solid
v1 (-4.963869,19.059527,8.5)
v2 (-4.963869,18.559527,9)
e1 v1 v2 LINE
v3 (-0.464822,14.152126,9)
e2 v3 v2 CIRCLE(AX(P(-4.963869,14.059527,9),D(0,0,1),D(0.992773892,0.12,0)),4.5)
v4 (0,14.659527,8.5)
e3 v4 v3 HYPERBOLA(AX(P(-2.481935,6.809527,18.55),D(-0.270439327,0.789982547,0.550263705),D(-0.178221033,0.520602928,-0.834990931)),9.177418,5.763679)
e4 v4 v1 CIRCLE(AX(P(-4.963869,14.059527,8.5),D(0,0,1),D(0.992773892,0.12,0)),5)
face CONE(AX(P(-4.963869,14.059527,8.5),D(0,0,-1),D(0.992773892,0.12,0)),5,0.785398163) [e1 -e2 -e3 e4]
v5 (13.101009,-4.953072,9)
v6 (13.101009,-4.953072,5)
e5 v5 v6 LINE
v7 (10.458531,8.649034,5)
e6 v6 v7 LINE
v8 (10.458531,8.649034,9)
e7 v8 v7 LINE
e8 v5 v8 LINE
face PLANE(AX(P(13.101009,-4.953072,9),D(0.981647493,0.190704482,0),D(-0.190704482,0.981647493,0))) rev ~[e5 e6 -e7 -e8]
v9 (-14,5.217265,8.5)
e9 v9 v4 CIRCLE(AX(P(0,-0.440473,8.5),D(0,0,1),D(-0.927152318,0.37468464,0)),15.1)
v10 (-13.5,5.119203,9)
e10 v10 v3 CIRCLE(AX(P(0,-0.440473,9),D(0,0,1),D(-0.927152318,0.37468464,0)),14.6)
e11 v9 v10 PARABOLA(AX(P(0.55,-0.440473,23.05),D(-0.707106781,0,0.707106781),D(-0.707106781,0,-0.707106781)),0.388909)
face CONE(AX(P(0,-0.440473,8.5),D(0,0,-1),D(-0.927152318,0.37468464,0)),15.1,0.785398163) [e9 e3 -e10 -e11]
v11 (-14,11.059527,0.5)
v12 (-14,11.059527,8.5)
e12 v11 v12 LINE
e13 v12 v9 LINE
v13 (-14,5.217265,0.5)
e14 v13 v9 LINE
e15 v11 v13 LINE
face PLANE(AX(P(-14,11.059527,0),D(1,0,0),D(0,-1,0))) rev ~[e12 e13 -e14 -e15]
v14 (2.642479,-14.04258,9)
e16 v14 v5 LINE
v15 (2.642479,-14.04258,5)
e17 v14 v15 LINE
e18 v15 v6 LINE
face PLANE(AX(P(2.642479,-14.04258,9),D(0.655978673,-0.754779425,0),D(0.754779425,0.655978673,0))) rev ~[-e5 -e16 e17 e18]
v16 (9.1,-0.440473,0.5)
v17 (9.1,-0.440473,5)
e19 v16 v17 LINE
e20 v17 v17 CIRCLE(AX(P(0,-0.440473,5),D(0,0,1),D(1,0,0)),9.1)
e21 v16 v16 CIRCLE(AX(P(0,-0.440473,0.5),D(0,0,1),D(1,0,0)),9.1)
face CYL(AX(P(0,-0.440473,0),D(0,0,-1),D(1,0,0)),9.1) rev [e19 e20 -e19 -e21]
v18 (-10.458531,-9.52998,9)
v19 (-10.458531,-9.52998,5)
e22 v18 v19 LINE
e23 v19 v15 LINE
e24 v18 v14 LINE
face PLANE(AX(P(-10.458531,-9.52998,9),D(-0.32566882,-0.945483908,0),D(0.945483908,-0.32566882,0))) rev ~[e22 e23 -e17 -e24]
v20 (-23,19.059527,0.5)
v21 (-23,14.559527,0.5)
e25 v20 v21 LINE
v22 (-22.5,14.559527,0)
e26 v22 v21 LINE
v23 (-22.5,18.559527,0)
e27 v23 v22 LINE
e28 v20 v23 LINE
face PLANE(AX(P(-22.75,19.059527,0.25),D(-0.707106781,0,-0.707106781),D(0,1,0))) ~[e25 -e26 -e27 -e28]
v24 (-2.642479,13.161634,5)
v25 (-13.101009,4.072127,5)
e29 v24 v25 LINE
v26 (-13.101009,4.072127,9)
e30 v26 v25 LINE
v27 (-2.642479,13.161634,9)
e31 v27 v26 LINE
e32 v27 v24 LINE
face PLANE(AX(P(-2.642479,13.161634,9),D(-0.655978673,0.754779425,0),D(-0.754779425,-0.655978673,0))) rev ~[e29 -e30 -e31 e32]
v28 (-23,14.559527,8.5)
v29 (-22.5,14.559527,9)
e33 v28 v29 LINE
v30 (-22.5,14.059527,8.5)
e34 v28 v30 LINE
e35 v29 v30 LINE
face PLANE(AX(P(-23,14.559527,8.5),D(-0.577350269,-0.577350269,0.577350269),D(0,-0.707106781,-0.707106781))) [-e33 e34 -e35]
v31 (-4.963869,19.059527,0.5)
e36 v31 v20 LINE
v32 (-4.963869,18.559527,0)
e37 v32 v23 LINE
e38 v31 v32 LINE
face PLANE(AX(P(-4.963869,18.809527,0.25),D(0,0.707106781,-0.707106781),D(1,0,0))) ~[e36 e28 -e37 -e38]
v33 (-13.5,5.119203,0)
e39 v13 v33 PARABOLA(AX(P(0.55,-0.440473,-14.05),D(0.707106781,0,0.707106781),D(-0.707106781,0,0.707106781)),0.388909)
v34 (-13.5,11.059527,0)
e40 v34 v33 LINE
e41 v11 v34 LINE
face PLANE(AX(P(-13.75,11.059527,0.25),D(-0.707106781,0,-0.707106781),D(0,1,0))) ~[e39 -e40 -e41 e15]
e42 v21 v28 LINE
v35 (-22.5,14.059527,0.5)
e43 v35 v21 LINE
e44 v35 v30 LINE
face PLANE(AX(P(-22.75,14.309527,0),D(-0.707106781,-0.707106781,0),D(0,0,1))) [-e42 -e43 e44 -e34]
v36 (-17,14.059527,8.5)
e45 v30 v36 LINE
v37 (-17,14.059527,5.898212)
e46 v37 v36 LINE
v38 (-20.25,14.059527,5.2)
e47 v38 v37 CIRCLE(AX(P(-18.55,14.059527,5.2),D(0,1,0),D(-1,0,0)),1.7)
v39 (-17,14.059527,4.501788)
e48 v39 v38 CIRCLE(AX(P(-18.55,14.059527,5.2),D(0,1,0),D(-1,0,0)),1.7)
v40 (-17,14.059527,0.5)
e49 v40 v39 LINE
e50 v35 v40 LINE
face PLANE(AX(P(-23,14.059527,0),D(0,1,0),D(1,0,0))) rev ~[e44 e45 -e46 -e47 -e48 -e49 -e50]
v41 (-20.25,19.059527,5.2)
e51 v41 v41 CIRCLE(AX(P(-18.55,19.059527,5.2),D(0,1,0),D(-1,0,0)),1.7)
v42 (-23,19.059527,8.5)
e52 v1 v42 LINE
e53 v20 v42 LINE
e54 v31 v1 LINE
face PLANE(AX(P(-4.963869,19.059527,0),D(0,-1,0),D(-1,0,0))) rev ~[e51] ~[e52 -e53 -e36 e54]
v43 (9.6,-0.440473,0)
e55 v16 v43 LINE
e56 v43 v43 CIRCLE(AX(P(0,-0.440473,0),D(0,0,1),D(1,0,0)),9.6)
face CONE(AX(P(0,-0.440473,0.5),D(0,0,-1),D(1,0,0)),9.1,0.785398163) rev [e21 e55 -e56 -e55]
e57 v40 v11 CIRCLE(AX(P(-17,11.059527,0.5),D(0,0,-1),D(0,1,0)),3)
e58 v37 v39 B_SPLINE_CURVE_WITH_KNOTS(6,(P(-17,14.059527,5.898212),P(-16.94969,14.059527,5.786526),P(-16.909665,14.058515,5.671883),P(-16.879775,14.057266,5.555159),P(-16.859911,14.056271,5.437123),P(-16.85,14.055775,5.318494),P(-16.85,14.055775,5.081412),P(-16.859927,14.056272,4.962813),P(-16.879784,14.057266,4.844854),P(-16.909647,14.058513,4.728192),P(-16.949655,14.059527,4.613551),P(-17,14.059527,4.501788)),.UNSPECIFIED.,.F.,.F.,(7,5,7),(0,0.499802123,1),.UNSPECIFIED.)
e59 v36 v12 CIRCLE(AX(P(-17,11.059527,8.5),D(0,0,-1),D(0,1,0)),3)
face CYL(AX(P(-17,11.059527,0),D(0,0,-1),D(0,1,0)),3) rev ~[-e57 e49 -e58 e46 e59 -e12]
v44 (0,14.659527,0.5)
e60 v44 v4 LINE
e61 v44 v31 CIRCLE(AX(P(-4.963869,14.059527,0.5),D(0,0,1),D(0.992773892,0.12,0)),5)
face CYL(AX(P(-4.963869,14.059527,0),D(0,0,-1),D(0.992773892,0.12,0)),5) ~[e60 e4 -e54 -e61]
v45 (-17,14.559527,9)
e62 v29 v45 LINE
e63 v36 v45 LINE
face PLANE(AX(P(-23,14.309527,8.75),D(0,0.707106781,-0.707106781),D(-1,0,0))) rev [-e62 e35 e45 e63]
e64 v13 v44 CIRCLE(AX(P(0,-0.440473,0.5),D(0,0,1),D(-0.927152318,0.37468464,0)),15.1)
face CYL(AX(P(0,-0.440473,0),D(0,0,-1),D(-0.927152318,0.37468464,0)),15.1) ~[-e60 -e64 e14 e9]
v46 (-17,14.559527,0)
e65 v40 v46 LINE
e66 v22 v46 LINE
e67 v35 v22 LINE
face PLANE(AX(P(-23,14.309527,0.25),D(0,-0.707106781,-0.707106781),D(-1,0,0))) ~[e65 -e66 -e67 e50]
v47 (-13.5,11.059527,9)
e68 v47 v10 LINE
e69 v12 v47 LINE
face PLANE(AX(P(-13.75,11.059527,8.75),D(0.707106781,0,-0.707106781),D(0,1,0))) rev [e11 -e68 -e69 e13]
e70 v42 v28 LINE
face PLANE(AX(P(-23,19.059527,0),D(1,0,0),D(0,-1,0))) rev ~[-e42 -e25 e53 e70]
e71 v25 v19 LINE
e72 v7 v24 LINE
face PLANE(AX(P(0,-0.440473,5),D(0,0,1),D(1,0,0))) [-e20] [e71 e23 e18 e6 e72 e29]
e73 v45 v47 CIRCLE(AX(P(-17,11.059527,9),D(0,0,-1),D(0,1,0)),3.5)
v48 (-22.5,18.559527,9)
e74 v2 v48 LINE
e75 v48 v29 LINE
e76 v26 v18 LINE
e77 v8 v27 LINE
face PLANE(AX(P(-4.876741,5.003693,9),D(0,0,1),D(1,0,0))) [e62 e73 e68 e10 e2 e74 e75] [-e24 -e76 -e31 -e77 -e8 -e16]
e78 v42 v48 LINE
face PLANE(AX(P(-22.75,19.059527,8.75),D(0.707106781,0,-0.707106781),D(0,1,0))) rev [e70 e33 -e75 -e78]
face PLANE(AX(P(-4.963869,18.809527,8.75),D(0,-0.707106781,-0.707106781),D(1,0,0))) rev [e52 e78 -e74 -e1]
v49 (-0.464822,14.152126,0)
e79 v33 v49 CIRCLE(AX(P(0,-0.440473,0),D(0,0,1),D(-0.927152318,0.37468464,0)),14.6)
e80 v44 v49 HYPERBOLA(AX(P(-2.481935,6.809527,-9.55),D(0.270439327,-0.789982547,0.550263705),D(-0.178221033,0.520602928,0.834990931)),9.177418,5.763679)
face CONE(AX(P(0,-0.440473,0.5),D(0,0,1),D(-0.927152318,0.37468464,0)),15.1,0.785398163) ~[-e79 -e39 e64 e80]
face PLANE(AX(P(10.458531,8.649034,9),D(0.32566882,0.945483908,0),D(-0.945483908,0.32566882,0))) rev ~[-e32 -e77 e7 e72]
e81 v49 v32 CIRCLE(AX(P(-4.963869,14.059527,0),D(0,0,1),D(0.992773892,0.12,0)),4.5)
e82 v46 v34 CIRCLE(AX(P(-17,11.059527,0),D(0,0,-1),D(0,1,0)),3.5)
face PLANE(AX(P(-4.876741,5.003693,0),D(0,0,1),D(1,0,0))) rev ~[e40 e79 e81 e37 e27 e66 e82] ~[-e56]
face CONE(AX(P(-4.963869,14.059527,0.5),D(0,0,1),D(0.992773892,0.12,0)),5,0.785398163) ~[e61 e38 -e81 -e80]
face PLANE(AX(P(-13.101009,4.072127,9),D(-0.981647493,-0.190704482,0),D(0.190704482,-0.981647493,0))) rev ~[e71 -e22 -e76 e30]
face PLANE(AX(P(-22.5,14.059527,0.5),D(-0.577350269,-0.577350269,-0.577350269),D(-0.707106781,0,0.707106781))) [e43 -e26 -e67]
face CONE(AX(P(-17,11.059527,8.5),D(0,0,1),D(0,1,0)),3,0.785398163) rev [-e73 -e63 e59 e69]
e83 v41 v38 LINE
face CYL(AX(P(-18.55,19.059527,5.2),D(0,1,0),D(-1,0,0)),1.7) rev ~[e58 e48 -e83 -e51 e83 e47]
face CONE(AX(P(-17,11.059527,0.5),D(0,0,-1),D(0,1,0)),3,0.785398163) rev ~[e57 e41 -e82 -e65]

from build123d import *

# Parameters (mm, degrees)
F0_R     = 9.1
F1_DEPTH = 9
F2_SIZE  = 0.5
F3_R     = 1.7
F4_DEPTH = 5.0047524467
F5_R     = 9.1
F6_DEPTH = 4


# Not quite as in the source:
# - a feature names something its author has since deleted; it is built from what else it names


with BuildPart() as f1:
    # F0 (on Top) → F1 (new body)
    with BuildSketch(Plane.XY):
        with BuildLine():
            Line((-14, 11.0595270927), (-14, 5.2172651566))
            ThreePointArc((-14, 5.2172651566), (8.443285949, -12.9592956308), (0, 14.6595270927))
            ThreePointArc((0, 14.6595270927), (-1.647244668, 17.8011844795), (-4.9638694584, 19.0595270927))
            Line((-4.9638694584, 19.0595270927), (-23, 19.0595270927))
            Line((-23, 19.0595270927), (-23, 14.0595270927))
            Line((-23, 14.0595270927), (-17, 14.0595270927))
            ThreePointArc((-17, 14.0595270927), (-14.8786796564, 13.1808474363), (-14, 11.0595270927))
        make_face()
        with Locations((0, -0.4404729073)):
            Circle(F0_R, mode=Mode.SUBTRACT)
    extrude(amount=F1_DEPTH)

    # F2
    f2_edges = [f1.edges().sort_by_distance(p)[0] for p in [
        (-23, 16.559527, 0),
        (-20, 14.059527, 0),
        (-14.87868, 13.180847, 0),
        (-14, 8.138396, 0),
        (8.443286, -12.959296, 0),
        (-1.647245, 17.801184, 0),
        (-13.981935, 19.059527, 0),
        (-9.1, -0.440473, 0),
        (8.443286, -12.959296, 9),
        (-14, 8.138396, 9),
        (-20, 14.059527, 9),
        (-14.87868, 13.180847, 9),
        (-23, 16.559527, 9),
        (-13.981935, 19.059527, 9),
        (-1.647245, 17.801184, 9),
        (-23, 14.059527, 4.5),
    ]]
    chamfer(f2_edges, length=F2_SIZE)

    # F3 (on face) → F4 (cut, through all)
    with BuildSketch(Plane(origin=(0, 19.0595270927, 0), x_dir=(-1, 0, 0), z_dir=(0, 1, 0))):
        with Locations((18.55, 5.2)):
            Circle(F3_R)
    extrude(amount=-F4_DEPTH, mode=Mode.SUBTRACT)

    # F5 (on face) → F6 (cut)
    with BuildSketch(Plane.XY.offset(9)):
        Polygon((-10.4585305038, -9.5299800281), (2.6424788226, -14.0425795703), (13.1010093265, -4.9530724494), (10.4585305038, 8.6490342136), (-2.6424788226, 13.1616337557), (-13.1010093265, 4.0721266349), align=None)
        with Locations((0, -0.4404729073)):
            Circle(F5_R, mode=Mode.SUBTRACT)
    extrude(amount=-F6_DEPTH, mode=Mode.SUBTRACT)


solid = f1.part
